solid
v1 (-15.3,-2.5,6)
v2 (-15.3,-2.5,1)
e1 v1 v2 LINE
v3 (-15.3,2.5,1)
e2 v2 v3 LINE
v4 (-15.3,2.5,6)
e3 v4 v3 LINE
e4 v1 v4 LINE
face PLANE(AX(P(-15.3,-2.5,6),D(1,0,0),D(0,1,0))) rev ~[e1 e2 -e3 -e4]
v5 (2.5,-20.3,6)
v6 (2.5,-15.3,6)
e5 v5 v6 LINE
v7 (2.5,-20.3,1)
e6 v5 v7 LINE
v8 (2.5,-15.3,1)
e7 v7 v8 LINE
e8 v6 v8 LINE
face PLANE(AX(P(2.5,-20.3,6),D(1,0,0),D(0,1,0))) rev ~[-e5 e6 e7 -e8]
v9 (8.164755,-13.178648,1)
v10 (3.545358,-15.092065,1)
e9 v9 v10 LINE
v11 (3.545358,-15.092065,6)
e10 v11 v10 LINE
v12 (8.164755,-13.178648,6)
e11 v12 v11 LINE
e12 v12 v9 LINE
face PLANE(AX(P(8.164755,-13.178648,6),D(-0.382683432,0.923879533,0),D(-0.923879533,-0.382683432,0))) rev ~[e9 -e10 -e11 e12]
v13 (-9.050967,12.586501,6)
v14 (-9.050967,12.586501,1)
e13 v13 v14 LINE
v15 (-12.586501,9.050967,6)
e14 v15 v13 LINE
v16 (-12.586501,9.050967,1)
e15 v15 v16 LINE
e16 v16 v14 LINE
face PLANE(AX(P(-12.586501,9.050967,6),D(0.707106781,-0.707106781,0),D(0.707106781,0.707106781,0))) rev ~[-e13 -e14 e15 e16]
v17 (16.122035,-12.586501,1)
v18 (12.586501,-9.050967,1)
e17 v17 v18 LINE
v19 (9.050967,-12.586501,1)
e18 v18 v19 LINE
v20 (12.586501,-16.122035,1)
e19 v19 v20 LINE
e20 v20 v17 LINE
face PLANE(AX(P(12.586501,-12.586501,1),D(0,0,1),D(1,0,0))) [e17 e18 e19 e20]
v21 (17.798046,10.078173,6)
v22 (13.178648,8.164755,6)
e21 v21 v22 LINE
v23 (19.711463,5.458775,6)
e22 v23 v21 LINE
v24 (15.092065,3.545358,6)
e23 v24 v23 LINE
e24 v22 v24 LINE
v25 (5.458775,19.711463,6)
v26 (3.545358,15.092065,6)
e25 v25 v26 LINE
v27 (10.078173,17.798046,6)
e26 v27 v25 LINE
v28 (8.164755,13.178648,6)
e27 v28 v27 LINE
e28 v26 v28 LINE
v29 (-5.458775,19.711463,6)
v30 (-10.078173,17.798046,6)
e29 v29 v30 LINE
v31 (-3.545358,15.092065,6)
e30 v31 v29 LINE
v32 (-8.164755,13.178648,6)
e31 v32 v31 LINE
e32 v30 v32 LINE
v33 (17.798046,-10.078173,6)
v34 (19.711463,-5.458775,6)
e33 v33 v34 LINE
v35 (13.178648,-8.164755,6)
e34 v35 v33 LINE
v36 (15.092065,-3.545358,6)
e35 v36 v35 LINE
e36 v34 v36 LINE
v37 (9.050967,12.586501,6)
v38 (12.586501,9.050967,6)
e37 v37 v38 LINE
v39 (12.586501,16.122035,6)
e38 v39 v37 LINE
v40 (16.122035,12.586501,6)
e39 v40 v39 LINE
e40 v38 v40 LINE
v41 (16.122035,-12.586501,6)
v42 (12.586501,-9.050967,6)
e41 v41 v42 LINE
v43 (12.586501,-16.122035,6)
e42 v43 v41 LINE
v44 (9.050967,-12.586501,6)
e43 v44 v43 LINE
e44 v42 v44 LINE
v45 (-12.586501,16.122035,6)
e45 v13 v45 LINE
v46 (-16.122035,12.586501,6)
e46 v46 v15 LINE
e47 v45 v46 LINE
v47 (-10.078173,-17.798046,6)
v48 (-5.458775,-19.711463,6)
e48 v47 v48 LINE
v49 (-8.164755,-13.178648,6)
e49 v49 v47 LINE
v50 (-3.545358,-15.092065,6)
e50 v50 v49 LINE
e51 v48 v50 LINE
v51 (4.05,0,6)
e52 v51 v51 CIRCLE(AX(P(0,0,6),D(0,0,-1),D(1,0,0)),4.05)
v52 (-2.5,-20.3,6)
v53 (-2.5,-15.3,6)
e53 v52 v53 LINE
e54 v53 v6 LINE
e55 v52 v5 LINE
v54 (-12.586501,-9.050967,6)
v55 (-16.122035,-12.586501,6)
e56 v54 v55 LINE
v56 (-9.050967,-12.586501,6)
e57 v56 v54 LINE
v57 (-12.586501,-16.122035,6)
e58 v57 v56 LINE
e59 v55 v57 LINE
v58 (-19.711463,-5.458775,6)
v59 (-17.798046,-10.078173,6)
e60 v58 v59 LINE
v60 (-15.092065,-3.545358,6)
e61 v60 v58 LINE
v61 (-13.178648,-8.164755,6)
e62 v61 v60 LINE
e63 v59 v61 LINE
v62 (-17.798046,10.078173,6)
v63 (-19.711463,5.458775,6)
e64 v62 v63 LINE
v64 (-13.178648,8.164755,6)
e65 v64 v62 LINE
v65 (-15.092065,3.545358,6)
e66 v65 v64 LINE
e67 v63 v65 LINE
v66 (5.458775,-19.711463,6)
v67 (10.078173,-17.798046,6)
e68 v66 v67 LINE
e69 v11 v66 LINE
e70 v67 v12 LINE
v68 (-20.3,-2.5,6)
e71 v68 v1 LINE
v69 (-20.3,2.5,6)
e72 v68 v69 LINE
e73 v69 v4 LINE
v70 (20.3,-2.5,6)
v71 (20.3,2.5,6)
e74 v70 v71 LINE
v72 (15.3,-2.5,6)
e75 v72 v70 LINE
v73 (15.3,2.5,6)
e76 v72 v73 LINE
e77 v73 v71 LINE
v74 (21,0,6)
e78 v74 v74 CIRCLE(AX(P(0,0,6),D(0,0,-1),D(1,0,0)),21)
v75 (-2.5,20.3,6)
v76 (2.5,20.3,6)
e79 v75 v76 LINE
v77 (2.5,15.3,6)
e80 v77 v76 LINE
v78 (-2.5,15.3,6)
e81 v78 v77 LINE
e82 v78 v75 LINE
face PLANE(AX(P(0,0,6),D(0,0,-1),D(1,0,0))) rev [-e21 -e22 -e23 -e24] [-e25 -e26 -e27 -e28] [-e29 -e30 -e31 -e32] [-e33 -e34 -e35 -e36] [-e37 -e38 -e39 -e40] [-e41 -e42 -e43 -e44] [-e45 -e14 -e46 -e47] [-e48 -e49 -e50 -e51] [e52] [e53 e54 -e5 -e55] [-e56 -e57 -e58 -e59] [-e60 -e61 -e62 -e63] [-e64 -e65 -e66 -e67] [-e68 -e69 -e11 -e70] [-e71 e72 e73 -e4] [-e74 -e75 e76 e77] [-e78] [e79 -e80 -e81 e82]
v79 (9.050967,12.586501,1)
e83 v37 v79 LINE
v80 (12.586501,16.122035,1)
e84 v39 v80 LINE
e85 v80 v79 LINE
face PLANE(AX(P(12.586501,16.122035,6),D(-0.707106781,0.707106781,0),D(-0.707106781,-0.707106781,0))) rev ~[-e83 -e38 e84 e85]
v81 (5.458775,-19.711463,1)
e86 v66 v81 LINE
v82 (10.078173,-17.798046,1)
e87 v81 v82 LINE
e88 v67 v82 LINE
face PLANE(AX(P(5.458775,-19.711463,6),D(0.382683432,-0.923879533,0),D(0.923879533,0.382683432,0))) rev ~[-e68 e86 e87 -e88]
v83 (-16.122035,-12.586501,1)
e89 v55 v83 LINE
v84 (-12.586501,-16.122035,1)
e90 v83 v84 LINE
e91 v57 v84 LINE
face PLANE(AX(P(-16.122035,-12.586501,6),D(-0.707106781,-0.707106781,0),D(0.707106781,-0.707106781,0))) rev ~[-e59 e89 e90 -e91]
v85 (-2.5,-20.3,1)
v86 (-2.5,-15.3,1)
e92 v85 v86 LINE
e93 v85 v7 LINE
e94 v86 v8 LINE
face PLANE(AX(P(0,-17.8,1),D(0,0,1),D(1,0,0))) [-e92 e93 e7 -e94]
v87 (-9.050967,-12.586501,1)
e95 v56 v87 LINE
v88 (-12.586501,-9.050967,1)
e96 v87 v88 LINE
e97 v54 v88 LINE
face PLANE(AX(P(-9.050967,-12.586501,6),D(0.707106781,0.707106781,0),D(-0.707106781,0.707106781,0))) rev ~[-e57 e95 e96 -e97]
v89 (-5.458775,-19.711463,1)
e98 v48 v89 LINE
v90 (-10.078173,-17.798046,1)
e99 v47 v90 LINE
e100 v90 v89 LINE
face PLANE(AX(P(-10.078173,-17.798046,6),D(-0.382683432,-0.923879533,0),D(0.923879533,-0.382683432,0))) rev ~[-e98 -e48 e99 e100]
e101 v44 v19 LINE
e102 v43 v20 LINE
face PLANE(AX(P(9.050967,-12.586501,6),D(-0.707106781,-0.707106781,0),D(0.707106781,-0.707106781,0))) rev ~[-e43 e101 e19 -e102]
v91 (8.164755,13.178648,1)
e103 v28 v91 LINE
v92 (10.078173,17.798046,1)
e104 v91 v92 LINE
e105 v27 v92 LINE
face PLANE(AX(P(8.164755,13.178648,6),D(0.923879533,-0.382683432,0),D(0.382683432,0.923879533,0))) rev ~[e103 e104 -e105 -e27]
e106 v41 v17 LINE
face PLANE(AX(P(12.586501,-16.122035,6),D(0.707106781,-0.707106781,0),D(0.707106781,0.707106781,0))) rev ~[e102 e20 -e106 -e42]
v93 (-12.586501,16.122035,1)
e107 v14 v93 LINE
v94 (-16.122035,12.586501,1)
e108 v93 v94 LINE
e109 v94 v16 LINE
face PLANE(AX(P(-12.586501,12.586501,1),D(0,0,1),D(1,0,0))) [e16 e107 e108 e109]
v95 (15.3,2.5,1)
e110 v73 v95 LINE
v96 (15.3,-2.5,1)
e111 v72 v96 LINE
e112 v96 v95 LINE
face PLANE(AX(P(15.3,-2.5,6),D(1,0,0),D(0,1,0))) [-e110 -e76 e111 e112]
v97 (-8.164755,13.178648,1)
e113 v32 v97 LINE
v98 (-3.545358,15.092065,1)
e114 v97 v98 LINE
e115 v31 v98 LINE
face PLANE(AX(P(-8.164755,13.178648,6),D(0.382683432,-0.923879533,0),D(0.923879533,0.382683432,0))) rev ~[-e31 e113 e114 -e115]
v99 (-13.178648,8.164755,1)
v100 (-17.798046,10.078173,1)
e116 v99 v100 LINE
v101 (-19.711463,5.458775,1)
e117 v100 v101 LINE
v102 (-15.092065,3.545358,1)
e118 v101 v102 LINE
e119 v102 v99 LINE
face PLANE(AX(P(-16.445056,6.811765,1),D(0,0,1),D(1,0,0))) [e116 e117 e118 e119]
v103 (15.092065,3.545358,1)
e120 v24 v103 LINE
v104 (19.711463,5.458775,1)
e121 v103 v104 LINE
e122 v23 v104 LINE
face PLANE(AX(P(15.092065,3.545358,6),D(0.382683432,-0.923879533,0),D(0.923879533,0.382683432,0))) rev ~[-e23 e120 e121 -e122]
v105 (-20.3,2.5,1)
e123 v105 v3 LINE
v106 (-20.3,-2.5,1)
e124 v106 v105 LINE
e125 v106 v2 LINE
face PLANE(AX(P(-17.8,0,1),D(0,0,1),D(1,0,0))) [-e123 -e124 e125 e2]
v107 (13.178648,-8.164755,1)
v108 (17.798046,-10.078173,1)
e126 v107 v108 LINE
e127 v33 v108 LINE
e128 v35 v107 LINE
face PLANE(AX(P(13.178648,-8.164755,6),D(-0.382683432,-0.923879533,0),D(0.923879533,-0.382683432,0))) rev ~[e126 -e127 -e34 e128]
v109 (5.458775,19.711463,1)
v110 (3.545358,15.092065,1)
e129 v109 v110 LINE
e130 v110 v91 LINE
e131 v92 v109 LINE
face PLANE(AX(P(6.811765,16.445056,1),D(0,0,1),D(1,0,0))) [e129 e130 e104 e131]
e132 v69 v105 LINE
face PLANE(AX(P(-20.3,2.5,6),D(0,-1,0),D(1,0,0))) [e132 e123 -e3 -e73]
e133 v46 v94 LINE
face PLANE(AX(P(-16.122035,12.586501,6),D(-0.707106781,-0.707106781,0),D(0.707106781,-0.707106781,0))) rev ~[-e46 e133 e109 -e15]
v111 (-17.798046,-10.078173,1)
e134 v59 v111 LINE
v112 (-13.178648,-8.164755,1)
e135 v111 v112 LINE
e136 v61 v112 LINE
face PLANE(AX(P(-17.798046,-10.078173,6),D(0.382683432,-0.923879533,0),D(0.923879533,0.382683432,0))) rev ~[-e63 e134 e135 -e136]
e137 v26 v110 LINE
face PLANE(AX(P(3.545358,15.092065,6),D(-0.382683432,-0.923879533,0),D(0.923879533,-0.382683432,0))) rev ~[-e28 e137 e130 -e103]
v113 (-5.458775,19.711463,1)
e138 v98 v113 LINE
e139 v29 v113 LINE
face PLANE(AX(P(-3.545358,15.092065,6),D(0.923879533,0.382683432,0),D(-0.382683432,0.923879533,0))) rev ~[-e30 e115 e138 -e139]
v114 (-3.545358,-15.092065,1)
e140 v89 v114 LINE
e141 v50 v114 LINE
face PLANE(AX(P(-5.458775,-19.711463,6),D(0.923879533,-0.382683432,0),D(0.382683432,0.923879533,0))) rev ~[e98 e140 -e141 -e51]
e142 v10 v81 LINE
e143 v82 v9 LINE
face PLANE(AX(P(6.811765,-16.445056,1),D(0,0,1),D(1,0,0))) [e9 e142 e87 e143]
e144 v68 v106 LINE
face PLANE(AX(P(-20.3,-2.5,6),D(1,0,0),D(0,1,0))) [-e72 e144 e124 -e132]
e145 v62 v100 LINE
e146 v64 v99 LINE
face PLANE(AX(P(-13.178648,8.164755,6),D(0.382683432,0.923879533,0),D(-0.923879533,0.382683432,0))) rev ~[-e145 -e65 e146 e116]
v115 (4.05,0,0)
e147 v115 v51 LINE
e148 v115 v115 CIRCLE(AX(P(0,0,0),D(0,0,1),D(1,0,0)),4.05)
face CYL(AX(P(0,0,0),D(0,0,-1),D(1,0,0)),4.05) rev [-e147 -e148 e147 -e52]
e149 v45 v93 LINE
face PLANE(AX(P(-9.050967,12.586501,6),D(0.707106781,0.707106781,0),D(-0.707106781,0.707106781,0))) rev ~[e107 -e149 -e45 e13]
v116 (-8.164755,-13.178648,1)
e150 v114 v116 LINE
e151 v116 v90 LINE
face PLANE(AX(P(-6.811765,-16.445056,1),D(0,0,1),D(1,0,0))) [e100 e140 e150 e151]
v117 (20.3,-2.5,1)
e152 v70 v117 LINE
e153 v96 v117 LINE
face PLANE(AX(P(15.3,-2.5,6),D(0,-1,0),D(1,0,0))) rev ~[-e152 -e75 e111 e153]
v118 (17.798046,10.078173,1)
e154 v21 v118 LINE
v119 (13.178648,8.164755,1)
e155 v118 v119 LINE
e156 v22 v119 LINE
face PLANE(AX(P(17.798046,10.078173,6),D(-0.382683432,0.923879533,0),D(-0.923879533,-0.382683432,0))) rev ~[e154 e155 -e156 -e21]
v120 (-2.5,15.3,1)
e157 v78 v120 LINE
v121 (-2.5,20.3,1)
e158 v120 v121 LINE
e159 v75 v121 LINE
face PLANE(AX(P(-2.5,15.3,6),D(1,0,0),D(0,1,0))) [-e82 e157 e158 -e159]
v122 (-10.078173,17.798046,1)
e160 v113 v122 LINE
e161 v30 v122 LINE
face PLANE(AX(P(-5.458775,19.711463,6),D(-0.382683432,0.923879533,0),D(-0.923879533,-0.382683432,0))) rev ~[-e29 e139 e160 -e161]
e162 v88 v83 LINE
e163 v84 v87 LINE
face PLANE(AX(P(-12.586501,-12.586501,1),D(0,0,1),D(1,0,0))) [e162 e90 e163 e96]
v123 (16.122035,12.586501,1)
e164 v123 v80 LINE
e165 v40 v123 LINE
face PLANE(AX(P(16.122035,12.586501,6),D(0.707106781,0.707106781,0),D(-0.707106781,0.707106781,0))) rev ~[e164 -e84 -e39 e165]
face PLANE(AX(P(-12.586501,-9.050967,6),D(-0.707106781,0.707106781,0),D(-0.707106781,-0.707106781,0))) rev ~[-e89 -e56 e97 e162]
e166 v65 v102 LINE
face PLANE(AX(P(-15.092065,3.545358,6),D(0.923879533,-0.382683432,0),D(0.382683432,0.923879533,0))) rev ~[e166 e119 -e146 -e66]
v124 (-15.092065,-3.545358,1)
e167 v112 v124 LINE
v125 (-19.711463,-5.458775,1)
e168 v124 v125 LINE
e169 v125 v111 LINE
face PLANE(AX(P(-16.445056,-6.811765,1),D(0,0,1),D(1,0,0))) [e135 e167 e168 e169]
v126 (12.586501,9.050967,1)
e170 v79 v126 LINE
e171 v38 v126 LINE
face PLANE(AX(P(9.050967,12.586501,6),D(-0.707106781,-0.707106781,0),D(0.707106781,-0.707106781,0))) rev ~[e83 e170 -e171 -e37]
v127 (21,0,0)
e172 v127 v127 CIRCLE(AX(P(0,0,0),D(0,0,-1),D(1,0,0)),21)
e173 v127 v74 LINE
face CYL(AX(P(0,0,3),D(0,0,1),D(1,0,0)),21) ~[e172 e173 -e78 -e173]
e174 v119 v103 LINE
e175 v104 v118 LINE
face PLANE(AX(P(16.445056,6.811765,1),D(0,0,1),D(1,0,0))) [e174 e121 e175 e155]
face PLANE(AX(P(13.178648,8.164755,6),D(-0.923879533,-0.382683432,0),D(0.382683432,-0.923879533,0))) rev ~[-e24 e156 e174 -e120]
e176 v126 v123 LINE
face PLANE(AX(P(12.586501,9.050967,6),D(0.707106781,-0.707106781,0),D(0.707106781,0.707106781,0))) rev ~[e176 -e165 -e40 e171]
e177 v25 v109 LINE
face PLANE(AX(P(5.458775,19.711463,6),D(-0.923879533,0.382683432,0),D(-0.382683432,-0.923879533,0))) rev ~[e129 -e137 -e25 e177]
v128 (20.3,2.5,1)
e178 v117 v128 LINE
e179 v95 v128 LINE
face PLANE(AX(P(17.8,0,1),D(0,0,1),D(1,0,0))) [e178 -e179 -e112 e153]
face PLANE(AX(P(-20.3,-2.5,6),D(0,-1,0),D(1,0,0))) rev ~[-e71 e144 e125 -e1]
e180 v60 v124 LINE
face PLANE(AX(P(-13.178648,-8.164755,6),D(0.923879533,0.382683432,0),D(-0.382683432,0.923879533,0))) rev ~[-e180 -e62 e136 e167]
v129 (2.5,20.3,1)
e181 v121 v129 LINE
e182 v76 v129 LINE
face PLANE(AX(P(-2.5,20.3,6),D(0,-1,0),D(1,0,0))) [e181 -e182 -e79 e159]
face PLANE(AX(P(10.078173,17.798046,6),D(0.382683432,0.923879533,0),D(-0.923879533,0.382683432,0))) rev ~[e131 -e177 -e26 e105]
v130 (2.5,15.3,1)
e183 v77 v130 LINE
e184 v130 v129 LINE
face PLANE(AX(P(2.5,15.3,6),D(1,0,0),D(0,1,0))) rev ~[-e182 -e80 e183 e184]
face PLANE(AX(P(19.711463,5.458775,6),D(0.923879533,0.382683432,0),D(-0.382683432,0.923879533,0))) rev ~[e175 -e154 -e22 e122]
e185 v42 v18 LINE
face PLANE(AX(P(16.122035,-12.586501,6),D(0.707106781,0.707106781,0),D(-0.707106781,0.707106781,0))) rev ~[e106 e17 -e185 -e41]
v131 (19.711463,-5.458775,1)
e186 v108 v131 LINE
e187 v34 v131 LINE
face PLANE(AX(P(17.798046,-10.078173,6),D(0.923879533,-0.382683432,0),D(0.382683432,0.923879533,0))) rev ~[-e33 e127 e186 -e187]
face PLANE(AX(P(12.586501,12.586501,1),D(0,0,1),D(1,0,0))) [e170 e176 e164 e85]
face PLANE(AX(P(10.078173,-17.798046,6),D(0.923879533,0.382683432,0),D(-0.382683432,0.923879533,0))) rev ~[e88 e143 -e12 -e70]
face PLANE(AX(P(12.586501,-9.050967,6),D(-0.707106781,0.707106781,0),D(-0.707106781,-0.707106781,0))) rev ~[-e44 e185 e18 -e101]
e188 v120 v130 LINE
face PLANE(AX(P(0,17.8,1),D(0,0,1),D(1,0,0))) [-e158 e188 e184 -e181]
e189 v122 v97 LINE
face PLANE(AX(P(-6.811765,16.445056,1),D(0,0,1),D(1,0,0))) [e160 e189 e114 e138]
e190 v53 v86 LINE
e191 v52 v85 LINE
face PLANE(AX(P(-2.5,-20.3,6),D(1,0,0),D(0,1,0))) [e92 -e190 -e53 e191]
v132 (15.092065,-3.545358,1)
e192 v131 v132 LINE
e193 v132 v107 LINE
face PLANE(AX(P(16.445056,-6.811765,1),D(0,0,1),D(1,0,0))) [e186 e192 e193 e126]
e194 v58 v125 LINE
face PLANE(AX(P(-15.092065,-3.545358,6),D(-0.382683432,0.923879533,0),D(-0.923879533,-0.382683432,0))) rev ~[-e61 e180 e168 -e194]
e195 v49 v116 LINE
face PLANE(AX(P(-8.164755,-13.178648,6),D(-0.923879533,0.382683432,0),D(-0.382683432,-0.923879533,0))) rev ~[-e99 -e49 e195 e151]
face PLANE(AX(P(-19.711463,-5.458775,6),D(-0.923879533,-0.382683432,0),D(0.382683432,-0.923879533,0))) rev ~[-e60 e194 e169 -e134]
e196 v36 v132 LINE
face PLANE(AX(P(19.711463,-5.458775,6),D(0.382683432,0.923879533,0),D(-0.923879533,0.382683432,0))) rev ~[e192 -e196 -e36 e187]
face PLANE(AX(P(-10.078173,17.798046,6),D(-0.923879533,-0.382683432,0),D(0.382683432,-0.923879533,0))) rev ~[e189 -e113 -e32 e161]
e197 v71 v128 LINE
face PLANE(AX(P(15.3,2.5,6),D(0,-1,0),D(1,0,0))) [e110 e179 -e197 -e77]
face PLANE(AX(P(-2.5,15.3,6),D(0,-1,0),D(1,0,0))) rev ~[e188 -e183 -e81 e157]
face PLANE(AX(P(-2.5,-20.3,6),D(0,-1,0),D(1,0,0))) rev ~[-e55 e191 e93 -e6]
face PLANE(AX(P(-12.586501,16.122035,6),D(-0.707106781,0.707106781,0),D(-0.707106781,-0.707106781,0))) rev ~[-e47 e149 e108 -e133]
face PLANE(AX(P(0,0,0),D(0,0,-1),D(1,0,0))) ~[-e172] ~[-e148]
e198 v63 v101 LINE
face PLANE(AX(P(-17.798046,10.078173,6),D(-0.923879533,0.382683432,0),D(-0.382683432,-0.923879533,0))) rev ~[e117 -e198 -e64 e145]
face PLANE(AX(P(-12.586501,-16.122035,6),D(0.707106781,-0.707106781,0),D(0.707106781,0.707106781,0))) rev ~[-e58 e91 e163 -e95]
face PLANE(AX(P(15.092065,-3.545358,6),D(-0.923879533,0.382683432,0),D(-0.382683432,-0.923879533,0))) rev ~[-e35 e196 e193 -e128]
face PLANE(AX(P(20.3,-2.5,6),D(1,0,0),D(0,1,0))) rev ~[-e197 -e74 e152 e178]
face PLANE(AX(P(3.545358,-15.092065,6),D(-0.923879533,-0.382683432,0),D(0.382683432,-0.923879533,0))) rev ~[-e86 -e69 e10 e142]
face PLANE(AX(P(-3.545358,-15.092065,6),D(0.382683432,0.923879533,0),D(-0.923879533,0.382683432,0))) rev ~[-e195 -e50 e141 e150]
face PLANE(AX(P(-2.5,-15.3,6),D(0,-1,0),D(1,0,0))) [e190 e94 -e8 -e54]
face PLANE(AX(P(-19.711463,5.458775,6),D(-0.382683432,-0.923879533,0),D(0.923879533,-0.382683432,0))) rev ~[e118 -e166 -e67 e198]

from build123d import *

# Parameters (mm, degrees)
F0_W     = 21
F0_H     = 6
F2_R     = 4.05
F3_DEPTH = 25
F4_W     = 5
F4_H     = 5
F5_DEPTH = 5


# Not quite as in the source:
# - a feature names something its author has since deleted; it is built from what else it names


with BuildPart() as f1:
    # F0 (on Front) → F1 (revolve)
    with BuildSketch(Plane.XZ):
        with Locations((10.5, 3)):
            Rectangle(F0_W, F0_H)
    revolve(axis=Axis((0, 0, 3), (0, 0, -1)))

    # F2 (on Top) → F3 (cut)
    with BuildSketch(Plane.XY):
        Circle(F2_R)
    extrude(amount=F3_DEPTH, mode=Mode.SUBTRACT)

    # F4 (on face) → F5 (cut)
    with BuildSketch(Plane.XY.offset(6)):
        with Locations((0, 17.8)):
            Rectangle(F4_W, F4_H)
        Polygon((3.5453576839, 15.0920654283), (8.1647553465, 13.1786482665), (10.0781725083, 17.7980459291), (5.4587748457, 19.7114630909), align=None)
        Polygon((9.0509667992, 12.5865007051), (12.5865007051, 9.0509667992), (16.1220346111, 12.5865007051), (12.5865007051, 16.1220346111), align=None)
        Polygon((13.1786482665, 8.1647553465), (15.0920654283, 3.5453576839), (19.7114630909, 5.4587748457), (17.7980459291, 10.0781725083), align=None)
        with Locations((17.8, 0)):
            Rectangle(F4_W, F4_H)
        Polygon((15.0920654283, -3.5453576839), (13.1786482665, -8.1647553465), (17.7980459291, -10.0781725083), (19.7114630909, -5.4587748457), align=None)
        Polygon((12.5865007051, -9.0509667992), (9.0509667992, -12.5865007051), (12.5865007051, -16.1220346111), (16.1220346111, -12.5865007051), align=None)
        Polygon((8.1647553465, -13.1786482665), (3.5453576839, -15.0920654283), (5.4587748457, -19.7114630909), (10.0781725083, -17.7980459291), align=None)
        with Locations((0, -17.8)):
            Rectangle(F4_W, F4_H)
        Polygon((-3.5453576839, -15.0920654283), (-8.1647553465, -13.1786482665), (-10.0781725083, -17.7980459291), (-5.4587748457, -19.7114630909), align=None)
        Polygon((-9.0509667992, -12.5865007051), (-12.5865007051, -9.0509667992), (-16.1220346111, -12.5865007051), (-12.5865007051, -16.1220346111), align=None)
        Polygon((-13.1786482665, -8.1647553465), (-15.0920654283, -3.5453576839), (-19.7114630909, -5.4587748457), (-17.7980459291, -10.0781725083), align=None)
        with Locations((-17.8, 0)):
            Rectangle(F4_W, F4_H)
        Polygon((-15.0920654283, 3.5453576839), (-13.1786482665, 8.1647553465), (-17.7980459291, 10.0781725083), (-19.7114630909, 5.4587748457), align=None)
        Polygon((-12.5865007051, 9.0509667992), (-9.0509667992, 12.5865007051), (-12.5865007051, 16.1220346111), (-16.1220346111, 12.5865007051), align=None)
        Polygon((-8.1647553465, 13.1786482665), (-3.5453576839, 15.0920654283), (-5.4587748457, 19.7114630909), (-10.0781725083, 17.7980459291), align=None)
    extrude(amount=-F5_DEPTH, mode=Mode.SUBTRACT)


solid = f1.part
